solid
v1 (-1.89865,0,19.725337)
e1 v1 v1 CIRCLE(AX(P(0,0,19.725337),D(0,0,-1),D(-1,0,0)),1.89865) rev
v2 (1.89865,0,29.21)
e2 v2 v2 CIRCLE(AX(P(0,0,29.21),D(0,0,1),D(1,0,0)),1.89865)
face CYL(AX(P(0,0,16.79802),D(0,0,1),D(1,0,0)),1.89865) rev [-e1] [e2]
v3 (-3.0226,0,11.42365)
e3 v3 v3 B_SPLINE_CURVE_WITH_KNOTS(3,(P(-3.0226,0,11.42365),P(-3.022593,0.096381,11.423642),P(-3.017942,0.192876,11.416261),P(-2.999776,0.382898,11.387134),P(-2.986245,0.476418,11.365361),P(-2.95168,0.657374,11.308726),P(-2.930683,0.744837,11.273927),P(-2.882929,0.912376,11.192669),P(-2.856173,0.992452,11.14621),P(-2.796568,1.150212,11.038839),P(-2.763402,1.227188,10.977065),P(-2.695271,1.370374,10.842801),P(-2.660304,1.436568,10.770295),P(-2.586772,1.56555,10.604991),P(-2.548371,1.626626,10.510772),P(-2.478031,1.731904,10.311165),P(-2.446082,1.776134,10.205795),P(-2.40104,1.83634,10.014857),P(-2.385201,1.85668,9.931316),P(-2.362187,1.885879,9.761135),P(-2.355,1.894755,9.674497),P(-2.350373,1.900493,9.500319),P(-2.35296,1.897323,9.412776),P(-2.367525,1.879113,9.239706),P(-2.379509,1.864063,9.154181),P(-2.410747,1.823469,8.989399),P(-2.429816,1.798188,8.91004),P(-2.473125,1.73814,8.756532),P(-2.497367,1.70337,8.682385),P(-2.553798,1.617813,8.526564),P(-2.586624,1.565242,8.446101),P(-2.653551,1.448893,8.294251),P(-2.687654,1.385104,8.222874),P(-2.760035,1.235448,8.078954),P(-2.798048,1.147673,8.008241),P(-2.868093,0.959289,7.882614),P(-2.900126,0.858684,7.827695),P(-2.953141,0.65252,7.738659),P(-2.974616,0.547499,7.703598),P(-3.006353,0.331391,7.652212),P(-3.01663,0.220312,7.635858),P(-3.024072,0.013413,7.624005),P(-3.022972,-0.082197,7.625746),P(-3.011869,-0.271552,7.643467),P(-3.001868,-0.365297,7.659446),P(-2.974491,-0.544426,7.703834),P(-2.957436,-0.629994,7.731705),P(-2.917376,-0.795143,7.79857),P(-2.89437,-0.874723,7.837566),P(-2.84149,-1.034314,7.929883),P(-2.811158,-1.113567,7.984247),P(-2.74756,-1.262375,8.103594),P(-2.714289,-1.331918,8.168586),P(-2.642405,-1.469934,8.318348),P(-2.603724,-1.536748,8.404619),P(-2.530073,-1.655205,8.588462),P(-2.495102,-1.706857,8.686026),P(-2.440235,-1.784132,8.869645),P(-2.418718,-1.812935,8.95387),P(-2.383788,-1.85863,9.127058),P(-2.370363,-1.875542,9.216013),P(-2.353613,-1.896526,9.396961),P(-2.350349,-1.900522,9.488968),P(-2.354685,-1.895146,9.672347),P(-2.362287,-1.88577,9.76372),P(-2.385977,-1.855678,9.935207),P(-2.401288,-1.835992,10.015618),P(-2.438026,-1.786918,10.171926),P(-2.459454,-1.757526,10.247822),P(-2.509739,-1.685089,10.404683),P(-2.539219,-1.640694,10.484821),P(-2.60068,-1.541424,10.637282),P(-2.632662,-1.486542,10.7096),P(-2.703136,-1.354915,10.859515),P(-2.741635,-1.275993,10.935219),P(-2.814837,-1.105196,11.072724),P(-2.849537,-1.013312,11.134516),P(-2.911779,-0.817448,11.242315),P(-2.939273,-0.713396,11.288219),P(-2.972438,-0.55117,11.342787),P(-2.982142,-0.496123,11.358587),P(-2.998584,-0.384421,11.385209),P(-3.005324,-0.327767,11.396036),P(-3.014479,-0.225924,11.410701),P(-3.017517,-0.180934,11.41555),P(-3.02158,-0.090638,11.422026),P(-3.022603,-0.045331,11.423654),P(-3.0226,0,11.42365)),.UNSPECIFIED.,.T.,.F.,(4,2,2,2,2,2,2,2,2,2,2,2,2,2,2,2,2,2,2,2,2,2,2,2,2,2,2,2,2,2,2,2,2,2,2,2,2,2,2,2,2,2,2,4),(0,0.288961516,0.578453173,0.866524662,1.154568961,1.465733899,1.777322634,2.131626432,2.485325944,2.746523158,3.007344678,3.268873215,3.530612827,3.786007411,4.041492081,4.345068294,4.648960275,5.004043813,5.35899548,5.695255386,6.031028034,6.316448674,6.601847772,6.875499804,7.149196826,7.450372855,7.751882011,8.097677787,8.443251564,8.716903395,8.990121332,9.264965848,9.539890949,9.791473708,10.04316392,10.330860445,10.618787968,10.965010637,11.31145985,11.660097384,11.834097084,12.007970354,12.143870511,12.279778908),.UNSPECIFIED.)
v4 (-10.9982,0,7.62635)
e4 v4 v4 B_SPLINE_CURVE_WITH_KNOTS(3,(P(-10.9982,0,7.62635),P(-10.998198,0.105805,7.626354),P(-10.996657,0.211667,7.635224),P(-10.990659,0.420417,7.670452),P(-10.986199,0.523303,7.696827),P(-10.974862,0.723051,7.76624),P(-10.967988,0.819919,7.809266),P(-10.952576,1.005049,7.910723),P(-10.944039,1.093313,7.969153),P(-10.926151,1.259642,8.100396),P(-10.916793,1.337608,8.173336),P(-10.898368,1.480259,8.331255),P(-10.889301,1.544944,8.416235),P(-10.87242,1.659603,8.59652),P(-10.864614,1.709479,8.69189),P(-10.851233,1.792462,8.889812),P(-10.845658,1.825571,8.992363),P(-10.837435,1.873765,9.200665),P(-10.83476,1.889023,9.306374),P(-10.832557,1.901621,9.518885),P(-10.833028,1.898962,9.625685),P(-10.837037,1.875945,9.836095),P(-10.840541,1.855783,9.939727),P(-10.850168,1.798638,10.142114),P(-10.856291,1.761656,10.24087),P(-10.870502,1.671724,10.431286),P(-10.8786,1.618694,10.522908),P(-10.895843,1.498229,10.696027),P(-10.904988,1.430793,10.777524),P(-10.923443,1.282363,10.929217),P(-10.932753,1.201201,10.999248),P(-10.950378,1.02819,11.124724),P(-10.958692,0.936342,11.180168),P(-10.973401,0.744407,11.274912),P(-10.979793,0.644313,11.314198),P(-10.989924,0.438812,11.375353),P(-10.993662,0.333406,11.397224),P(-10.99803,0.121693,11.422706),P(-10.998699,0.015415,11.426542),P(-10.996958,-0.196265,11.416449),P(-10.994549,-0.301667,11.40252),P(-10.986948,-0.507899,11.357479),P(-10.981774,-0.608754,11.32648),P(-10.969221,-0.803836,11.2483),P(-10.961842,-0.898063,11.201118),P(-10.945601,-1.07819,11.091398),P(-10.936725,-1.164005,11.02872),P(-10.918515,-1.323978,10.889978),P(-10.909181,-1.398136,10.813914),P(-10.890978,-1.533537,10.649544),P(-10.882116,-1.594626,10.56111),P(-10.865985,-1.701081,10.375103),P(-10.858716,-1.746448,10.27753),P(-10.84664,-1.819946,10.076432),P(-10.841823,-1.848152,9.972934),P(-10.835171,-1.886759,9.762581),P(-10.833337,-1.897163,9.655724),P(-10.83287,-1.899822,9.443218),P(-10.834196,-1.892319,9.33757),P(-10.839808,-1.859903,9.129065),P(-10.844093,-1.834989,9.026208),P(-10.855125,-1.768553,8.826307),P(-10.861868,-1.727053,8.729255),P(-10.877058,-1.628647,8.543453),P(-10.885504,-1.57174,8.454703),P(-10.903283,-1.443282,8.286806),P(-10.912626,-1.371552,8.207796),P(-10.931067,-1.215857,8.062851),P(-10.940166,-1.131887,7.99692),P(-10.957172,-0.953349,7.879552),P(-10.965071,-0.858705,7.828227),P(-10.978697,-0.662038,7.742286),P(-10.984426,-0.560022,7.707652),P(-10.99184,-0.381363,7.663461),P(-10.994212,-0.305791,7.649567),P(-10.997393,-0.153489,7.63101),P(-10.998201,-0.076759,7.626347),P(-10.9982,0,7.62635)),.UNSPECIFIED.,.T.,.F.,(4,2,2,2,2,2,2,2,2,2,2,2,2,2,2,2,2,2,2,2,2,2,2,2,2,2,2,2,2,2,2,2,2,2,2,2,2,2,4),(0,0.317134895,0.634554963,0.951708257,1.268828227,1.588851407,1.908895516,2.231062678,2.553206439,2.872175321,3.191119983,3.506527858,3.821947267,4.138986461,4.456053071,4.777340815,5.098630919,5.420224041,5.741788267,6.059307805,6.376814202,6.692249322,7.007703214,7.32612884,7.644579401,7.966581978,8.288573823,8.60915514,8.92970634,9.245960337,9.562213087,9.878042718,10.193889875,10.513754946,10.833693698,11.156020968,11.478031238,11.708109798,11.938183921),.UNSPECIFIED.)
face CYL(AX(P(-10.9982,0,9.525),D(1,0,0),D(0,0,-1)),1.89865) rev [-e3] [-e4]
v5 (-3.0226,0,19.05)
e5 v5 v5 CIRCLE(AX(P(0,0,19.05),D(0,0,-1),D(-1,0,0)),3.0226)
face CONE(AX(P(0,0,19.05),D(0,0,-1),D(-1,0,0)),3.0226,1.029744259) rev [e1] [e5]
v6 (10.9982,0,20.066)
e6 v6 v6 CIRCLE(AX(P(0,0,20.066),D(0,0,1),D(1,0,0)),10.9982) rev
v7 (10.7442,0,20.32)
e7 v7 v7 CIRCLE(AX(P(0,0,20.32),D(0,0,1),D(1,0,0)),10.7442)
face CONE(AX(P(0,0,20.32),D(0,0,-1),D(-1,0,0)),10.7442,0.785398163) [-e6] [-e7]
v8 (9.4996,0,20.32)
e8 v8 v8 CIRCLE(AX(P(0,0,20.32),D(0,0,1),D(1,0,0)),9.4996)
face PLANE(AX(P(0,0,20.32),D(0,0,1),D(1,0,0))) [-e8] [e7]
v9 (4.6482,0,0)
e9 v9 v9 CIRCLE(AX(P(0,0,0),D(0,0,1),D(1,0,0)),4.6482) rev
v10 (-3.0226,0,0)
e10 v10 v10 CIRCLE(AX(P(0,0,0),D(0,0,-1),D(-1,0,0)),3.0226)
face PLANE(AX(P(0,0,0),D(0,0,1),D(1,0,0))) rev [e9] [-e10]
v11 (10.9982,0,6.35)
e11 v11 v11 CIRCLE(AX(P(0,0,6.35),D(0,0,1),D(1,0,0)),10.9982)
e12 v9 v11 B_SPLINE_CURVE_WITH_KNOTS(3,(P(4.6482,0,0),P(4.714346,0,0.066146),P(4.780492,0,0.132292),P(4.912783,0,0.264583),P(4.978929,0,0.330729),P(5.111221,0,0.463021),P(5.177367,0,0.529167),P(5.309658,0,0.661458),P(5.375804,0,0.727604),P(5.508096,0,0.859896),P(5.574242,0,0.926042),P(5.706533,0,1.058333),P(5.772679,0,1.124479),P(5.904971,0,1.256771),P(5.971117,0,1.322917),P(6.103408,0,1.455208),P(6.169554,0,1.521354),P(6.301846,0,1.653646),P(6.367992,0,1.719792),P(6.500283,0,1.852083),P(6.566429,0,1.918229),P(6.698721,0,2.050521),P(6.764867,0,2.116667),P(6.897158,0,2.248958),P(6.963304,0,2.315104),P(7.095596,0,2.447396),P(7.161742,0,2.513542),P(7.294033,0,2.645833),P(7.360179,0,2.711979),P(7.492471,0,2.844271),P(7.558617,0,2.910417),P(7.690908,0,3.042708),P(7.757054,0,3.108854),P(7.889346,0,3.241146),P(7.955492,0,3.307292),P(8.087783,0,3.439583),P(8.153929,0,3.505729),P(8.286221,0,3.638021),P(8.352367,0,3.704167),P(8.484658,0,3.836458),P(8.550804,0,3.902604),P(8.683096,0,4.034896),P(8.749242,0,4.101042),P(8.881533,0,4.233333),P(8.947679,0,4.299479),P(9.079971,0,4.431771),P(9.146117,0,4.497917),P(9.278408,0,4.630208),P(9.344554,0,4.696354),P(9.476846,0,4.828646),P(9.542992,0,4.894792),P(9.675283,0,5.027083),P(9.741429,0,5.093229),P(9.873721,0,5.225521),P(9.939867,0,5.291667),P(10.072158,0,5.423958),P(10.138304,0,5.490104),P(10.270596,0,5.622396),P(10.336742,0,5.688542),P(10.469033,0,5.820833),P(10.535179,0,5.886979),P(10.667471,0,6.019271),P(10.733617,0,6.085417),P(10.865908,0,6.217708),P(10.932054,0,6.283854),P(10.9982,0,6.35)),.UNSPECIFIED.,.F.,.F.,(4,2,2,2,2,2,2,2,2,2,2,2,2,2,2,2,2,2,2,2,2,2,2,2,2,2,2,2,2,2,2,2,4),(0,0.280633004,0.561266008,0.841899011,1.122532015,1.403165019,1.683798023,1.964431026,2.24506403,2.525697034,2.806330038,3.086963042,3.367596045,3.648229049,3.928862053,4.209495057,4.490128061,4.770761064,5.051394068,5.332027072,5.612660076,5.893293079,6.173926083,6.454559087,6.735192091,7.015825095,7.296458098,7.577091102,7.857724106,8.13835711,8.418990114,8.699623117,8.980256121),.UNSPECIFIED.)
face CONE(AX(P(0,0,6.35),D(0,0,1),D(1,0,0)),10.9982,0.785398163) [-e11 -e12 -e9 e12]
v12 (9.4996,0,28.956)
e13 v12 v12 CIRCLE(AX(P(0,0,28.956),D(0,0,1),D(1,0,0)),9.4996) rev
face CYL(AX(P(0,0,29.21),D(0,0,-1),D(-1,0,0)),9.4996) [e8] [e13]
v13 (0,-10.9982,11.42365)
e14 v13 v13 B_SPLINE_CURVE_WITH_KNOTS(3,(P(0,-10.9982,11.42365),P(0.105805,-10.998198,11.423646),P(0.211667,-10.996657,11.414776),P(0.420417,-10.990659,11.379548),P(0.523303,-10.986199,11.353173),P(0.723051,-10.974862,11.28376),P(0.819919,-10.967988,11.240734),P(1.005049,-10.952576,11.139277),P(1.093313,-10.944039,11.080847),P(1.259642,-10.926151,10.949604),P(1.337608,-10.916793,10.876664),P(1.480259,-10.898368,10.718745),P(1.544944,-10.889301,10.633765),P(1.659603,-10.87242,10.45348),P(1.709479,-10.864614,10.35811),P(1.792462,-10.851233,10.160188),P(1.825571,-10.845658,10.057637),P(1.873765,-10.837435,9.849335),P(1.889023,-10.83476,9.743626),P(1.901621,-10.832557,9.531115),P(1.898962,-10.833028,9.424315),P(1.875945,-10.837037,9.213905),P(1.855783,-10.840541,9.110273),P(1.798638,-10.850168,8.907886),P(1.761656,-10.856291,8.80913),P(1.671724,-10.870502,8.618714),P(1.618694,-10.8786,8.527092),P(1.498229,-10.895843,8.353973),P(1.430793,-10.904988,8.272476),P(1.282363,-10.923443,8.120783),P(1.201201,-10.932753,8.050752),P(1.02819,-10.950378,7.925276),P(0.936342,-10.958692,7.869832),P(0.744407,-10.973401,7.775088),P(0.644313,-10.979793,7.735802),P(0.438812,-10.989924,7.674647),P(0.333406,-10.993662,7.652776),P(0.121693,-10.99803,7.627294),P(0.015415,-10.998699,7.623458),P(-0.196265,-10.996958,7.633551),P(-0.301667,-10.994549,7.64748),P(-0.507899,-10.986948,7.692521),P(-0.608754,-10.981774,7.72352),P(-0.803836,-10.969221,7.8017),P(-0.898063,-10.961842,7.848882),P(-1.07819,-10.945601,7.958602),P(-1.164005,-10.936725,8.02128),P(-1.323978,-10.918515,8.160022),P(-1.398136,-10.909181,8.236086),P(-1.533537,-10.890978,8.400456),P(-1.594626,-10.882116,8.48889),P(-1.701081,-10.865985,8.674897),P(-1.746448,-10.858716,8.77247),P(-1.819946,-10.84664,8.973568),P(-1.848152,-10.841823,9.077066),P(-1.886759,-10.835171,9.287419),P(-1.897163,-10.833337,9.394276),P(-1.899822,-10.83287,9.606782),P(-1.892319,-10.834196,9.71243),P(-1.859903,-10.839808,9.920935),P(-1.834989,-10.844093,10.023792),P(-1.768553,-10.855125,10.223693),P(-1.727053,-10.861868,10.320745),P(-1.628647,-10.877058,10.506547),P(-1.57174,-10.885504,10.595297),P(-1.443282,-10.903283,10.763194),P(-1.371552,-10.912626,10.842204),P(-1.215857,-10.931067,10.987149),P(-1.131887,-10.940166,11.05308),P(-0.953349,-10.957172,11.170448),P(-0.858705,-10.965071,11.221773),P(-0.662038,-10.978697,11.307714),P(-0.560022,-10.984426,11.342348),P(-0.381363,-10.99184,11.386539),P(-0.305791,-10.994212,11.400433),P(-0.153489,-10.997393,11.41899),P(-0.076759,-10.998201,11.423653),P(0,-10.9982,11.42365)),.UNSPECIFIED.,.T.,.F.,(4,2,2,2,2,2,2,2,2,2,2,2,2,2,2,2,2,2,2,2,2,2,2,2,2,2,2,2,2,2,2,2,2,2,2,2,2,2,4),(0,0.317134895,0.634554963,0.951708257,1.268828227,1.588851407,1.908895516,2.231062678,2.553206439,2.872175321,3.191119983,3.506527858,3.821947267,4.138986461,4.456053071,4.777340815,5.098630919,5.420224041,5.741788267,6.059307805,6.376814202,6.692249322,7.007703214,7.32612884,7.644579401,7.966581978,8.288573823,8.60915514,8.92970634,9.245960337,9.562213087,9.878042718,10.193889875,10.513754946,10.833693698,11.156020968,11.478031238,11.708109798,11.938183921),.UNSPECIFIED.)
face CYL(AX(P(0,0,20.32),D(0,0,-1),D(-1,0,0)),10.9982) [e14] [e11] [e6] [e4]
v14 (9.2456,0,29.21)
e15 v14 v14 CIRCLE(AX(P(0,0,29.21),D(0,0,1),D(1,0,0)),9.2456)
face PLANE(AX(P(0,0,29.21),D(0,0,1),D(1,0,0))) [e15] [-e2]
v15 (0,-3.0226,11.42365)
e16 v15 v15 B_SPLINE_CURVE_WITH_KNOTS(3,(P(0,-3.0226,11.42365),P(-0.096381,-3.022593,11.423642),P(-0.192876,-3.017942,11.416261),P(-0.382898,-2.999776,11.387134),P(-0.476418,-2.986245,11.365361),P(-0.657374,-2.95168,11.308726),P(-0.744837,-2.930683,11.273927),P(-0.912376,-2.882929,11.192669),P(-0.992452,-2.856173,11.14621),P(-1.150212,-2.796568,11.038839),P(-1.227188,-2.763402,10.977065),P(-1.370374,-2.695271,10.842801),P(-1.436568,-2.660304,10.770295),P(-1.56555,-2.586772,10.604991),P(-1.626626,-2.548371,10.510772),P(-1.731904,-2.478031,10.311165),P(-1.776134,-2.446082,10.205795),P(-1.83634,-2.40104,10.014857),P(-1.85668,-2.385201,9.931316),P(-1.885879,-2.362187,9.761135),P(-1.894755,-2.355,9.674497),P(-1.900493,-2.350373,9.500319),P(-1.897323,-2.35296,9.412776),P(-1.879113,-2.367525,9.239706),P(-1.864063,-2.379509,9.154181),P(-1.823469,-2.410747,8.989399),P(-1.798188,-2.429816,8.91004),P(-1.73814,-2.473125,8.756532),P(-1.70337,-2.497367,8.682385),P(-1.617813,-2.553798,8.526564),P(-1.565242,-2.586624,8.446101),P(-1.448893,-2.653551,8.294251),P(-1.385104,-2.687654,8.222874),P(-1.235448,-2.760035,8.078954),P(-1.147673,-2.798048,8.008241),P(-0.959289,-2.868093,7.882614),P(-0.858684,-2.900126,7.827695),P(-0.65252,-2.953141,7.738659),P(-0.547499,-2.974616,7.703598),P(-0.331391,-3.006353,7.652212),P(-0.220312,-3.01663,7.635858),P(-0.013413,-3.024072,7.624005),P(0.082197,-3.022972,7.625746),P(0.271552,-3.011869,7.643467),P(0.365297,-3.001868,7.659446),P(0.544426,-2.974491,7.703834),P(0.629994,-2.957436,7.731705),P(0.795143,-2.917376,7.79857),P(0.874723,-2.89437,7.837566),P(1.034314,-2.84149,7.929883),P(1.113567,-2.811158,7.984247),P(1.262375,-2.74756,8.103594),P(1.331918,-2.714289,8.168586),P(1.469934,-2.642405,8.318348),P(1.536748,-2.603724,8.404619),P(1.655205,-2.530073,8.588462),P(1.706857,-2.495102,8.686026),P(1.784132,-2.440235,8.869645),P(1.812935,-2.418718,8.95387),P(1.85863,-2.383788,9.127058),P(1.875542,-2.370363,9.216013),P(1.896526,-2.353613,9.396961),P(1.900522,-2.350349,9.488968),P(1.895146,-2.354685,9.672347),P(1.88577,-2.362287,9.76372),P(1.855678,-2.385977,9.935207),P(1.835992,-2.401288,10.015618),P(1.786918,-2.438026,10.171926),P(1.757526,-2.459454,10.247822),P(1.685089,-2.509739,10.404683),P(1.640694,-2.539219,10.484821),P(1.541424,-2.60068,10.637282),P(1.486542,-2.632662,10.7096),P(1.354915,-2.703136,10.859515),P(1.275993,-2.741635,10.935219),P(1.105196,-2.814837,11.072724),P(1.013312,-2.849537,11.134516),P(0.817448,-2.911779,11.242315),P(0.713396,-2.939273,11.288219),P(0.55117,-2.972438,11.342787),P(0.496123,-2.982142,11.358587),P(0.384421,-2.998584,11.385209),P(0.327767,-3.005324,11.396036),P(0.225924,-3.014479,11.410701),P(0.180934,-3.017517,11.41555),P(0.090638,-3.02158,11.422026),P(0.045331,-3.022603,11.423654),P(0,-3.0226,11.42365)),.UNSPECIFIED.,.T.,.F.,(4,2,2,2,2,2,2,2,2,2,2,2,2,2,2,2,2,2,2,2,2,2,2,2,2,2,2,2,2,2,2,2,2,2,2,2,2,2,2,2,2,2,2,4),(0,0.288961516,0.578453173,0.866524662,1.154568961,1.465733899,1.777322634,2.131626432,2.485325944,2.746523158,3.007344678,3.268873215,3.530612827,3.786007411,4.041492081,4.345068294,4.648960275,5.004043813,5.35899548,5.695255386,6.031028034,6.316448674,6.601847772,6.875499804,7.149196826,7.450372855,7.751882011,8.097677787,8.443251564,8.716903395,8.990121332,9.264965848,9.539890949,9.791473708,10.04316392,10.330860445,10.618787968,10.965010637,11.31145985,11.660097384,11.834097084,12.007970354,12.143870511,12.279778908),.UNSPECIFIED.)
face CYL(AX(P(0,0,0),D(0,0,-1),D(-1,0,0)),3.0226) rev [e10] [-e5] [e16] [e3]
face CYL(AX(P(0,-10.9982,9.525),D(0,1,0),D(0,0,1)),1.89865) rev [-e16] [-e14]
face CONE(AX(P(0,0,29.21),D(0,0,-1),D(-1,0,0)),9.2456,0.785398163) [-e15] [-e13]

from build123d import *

# Parameters (mm, degrees)
SKETCH1_R                    = 10.9982
BOSS_EXTRUDE1_DEPTH          = 20.32
SKETCH2_R                    = 9.4996
BOSS_EXTRUDE2_DEPTH          = 8.89
B_0_238_DIAMETER_HOLE1_D     = 6.0452
B_0_238_DIAMETER_HOLE1_DEPTH = 19.05
B_0_238_DIAMETER_HOLE1_TIP   = 1.816161307
BOSS_EXTRUDE5_START          = -9.484662807
BOSS_EXTRUDE5_OUTLINE_R      = 1.89865
BOSS_EXTRUDE5_DEPTH          = 9.484662807
SKETCH11_R                   = 1.89865
CUT_EXTRUDE1_DEPTH           = 34.092973672
SKETCH12_R                   = 1.89865
CUT_EXTRUDE2_DEPTH           = 34.092973739
CHAMFER1_SIZE                = 6.35
CHAMFER2_SIZE                = 0.254
CHAMFER3_SIZE                = 0.254


# Read off the part's stored shape, not the designer's step: Boss-Extrude5
with BuildPart() as part:
    # Sketch1 → Boss-Extrude1 (new body)
    with BuildSketch(Plane.XY):
        Circle(SKETCH1_R)
    extrude(amount=BOSS_EXTRUDE1_DEPTH)

    # Sketch2 → Boss-Extrude2 (add)
    with BuildSketch(Plane.XY.offset(20.32)):
        Circle(SKETCH2_R)
    extrude(amount=BOSS_EXTRUDE2_DEPTH)

    # B (0.238) Diameter Hole1
    with Locations(Plane(origin=(0, 0, 0), x_dir=(-1, 0, 0), z_dir=(0, 0, -1))):
        with Locations((0, 0)):
            Hole(B_0_238_DIAMETER_HOLE1_D / 2, depth=B_0_238_DIAMETER_HOLE1_DEPTH)
            with Locations((0, 0, -(B_0_238_DIAMETER_HOLE1_DEPTH + B_0_238_DIAMETER_HOLE1_TIP / 2))):  # 118° drill point
                Cone(0, B_0_238_DIAMETER_HOLE1_D / 2, B_0_238_DIAMETER_HOLE1_TIP, mode=Mode.SUBTRACT)

    # Boss-Extrude5 outline → Boss-Extrude5 (cut)
    with BuildSketch(Plane.XY.offset(29.21).offset(BOSS_EXTRUDE5_START)):
        Circle(BOSS_EXTRUDE5_OUTLINE_R)
    extrude(amount=BOSS_EXTRUDE5_DEPTH, mode=Mode.SUBTRACT)

    # Sketch11 → Cut-Extrude1 (cut, through all)
    with BuildSketch(Plane(origin=(0, 0, 0), x_dir=(1, 0, 0), z_dir=(0, 1, 0))):
        with Locations(Location((0, -9.525, 0), (0, 0, 270))):
            Circle(SKETCH11_R)
    extrude(amount=-CUT_EXTRUDE1_DEPTH, mode=Mode.SUBTRACT)

    # Sketch12 → Cut-Extrude2 (cut, through all)
    with BuildSketch(Plane(origin=(0, 0, 0), x_dir=(0, 0, -1), z_dir=(1, 0, 0))):
        with Locations((-9.525, 0)):
            Circle(SKETCH12_R)
    extrude(amount=-CUT_EXTRUDE2_DEPTH, mode=Mode.SUBTRACT)

    # Chamfer1
    chamfer1_edges = [part.edges().sort_by_distance(p)[0] for p in [
        (-10.9982, 0, 0),
    ]]
    chamfer(chamfer1_edges, length=CHAMFER1_SIZE)

    # Chamfer2
    chamfer2_edges = [part.edges().sort_by_distance(p)[0] for p in [
        (-10.9982, 0, 20.32),
    ]]
    chamfer(chamfer2_edges, length=CHAMFER2_SIZE)

    # Chamfer3
    chamfer3_edges = [part.edges().sort_by_distance(p)[0] for p in [
        (-9.4996, 0, 29.21),
    ]]
    chamfer(chamfer3_edges, length=CHAMFER3_SIZE)


solid = part.part
